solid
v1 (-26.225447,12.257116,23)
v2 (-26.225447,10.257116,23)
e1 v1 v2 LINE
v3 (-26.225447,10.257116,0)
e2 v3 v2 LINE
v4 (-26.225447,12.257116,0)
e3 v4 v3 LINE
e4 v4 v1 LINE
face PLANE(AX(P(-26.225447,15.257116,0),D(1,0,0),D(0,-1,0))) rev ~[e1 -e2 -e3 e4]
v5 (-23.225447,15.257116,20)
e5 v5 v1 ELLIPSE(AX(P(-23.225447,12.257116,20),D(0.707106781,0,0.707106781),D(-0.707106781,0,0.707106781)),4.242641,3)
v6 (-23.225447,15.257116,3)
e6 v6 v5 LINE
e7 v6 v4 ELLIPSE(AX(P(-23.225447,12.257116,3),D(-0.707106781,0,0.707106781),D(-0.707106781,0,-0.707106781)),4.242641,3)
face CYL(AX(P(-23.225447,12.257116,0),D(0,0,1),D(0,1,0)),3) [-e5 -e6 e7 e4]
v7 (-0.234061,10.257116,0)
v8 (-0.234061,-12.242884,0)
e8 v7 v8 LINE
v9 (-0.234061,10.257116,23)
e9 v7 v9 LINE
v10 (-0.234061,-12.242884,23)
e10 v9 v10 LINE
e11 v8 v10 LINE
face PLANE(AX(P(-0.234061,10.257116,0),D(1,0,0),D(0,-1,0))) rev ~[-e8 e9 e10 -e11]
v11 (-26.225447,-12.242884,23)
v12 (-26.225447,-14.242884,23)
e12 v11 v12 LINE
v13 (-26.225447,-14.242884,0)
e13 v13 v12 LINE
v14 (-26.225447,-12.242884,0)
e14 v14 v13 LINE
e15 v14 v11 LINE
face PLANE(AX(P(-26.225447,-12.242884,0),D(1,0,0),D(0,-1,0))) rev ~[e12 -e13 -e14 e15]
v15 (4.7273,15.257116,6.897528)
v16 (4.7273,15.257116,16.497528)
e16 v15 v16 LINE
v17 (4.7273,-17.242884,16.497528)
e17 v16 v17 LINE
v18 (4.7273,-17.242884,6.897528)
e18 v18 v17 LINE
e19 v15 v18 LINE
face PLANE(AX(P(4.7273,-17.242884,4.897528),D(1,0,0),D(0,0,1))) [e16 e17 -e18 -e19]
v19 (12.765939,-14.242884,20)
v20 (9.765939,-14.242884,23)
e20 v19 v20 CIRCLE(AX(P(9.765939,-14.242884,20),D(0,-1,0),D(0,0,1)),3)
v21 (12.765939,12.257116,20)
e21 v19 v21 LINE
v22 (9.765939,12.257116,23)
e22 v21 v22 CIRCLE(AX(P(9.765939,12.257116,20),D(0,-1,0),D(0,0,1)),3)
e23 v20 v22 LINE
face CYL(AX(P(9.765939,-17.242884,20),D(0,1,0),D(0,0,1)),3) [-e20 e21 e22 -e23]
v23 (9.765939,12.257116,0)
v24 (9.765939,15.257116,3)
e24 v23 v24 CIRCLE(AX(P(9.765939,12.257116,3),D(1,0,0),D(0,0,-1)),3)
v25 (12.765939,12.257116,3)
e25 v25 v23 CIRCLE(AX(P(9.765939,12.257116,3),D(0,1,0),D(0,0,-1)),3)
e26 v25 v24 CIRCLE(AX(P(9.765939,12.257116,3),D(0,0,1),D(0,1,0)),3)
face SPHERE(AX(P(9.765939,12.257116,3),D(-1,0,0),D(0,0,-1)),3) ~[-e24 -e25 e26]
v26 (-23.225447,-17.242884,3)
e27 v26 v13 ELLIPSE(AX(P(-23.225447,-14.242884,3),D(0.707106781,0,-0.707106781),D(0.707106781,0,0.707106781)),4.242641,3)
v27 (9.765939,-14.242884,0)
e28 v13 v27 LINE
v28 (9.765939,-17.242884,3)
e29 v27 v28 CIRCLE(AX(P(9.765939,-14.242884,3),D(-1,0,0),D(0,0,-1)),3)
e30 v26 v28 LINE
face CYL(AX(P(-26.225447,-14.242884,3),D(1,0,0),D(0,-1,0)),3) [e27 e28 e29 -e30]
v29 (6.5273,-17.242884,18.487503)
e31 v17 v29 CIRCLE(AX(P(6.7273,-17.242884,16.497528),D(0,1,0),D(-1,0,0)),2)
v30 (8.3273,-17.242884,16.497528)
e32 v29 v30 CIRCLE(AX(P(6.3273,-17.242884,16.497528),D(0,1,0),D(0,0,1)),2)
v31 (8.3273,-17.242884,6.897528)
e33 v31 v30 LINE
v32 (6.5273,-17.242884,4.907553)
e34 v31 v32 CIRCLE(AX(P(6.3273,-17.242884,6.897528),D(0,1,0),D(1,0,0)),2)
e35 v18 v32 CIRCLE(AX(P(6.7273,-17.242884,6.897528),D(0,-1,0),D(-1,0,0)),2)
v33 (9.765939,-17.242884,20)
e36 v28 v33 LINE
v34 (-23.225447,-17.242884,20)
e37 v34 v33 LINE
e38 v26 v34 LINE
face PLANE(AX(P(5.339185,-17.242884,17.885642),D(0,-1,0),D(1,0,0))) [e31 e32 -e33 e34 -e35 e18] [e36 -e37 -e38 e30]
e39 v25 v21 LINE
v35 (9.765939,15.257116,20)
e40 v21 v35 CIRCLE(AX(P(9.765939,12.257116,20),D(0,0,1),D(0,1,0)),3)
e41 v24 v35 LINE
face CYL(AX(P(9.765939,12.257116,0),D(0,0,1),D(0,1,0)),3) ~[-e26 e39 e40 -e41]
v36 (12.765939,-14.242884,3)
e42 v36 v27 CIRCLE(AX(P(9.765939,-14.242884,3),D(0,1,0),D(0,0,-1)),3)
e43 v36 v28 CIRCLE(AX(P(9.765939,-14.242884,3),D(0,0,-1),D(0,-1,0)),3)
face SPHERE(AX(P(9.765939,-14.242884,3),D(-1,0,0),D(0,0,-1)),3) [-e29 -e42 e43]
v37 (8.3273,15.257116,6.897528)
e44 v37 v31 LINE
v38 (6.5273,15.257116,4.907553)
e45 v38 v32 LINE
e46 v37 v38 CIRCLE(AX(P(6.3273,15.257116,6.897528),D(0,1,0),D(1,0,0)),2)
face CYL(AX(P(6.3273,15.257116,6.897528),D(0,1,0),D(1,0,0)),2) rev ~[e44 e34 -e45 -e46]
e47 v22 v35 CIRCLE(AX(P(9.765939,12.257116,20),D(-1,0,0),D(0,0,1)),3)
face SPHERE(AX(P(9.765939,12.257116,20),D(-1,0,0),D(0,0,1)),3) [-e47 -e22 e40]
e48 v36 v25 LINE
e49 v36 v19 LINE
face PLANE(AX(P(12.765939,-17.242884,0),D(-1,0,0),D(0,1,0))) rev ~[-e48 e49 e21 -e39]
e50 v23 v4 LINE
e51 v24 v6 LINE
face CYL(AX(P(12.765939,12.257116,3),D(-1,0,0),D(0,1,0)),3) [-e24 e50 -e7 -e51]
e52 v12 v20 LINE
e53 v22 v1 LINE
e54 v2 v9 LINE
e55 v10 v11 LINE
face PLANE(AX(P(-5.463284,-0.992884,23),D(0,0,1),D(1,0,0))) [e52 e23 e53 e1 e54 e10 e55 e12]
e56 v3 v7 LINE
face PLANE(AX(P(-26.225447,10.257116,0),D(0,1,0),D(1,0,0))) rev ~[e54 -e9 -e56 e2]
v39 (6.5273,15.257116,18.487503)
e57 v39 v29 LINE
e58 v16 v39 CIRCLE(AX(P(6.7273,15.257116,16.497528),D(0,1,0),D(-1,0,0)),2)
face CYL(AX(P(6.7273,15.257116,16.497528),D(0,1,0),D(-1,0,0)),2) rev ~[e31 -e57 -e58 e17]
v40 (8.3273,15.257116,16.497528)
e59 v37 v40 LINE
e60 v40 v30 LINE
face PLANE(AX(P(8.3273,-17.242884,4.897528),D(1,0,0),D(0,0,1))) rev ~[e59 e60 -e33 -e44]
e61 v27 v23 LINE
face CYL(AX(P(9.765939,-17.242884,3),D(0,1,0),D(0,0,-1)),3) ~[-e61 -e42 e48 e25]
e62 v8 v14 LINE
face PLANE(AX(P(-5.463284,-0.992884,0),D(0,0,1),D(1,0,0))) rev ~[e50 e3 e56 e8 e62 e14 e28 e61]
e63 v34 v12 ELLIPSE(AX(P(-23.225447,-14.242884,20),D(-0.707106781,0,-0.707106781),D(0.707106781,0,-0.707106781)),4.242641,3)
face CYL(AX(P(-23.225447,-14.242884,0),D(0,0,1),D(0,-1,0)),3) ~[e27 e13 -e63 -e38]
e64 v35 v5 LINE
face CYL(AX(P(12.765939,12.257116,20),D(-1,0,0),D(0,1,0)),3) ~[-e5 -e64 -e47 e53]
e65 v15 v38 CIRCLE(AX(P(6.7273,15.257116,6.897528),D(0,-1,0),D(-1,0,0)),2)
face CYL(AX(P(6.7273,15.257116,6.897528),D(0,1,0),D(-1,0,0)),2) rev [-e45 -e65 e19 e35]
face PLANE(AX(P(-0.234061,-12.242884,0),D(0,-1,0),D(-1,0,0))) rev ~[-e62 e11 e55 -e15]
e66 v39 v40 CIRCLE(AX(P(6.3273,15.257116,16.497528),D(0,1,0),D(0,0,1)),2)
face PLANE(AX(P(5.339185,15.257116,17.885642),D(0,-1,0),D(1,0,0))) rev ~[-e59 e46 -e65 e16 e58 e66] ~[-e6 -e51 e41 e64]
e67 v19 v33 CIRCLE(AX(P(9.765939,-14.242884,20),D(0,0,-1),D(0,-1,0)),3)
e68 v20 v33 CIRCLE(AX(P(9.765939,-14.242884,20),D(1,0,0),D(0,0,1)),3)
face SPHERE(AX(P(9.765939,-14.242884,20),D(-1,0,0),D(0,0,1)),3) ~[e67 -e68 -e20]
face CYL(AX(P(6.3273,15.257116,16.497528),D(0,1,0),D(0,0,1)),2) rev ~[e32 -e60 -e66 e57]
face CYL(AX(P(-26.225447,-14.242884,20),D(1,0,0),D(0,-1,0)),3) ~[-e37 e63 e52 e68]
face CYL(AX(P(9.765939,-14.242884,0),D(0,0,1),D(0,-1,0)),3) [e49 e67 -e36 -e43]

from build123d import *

# Parameters (mm, degrees)
F1_DEPTH    = 23
F2_W        = 3.6
F2_H        = 13.6
F3_DEPTH    = 48.7
F4_T1_DEPTH = 32.5
F5_R        = 3


# Not quite as in the source:
# - a fillet or chamfer that OpenCascade refuses, or shapes differently, is made with other operations: its cross-section is extruded or revolved along the edge and cut away or added


with BuildPart() as f1:
    # F0 (on Top) → F1 (new body)
    with BuildSketch(Plane.XY):
        Polygon((12.7659387215, -17.2428843321), (12.7659387215, 15.2571156679), (-26.2254474751, 15.2571156679), (-26.2254474751, 10.2571156679), (-0.2340612785, 10.2571156679), (-0.2340612785, -12.2428843321), (-26.2254474751, -12.2428843321), (-26.2254474751, -17.2428843321), align=None)
    extrude(amount=F1_DEPTH)

    # F2 (on face) → F3 (cut)
    with BuildSketch(Plane.XZ.offset(17.2428843321)):
        with Locations((6.5272997685, 11.6975279525)):
            Rectangle(F2_W, F2_H)
    extrude(amount=-F3_DEPTH, mode=Mode.SUBTRACT)

    # F4: fillet of radius 2 on 4 edges, made by hand

    # F4_s2 → F4_t1 (join)
    with BuildSketch(Plane.XZ.offset(-15.2571156679)):
        with BuildLine():
            ThreePointArc((4.7272997685, 16.4975279525), (5.3130862061, 17.9117415149), (6.7272997685, 18.4975279525))
            Line((6.7272997685, 18.4975279525), (4.7272997685, 18.4975279525))
            Line((4.7272997685, 18.4975279525), (4.7272997685, 16.4975279525))
        make_face()
        with BuildLine():
            ThreePointArc((4.7272997685, 6.8975279525), (5.3130862061, 5.4833143901), (6.7272997685, 4.8975279525))
            Line((6.7272997685, 4.8975279525), (4.7272997685, 4.8975279525))
            Line((4.7272997685, 4.8975279525), (4.7272997685, 6.8975279525))
        make_face()
        with BuildLine():
            ThreePointArc((6.3272997685, 18.4975279525), (7.7415133308, 17.9117415149), (8.3272997685, 16.4975279525))
            Line((8.3272997685, 16.4975279525), (8.3272997685, 18.4975279525))
            Line((8.3272997685, 18.4975279525), (6.3272997685, 18.4975279525))
        make_face()
        with BuildLine():
            ThreePointArc((8.3272997685, 6.8975279525), (7.7415133308, 5.4833143901), (6.3272997685, 4.8975279525))
            Line((6.3272997685, 4.8975279525), (8.3272997685, 4.8975279525))
            Line((8.3272997685, 4.8975279525), (8.3272997685, 6.8975279525))
        make_face()
    extrude(amount=F4_T1_DEPTH)

    # F5
    f5_edges = [f1.edges().sort_by_distance(p)[0] for p in [
        (-6.729754, 15.257116, 0),
        (-26.225447, 15.257116, 11.5),
        (-6.729754, 15.257116, 23),
        (-6.729754, -17.242884, 23),
        (12.765939, -0.992884, 23),
        (-6.729754, -17.242884, 0),
        (12.765939, -0.992884, 0),
        (12.765939, -17.242884, 11.5),
        (12.765939, 15.257116, 11.5),
        (-26.225447, -17.242884, 11.5),
    ]]
    fillet(f5_edges, radius=F5_R)


solid = f1.part
